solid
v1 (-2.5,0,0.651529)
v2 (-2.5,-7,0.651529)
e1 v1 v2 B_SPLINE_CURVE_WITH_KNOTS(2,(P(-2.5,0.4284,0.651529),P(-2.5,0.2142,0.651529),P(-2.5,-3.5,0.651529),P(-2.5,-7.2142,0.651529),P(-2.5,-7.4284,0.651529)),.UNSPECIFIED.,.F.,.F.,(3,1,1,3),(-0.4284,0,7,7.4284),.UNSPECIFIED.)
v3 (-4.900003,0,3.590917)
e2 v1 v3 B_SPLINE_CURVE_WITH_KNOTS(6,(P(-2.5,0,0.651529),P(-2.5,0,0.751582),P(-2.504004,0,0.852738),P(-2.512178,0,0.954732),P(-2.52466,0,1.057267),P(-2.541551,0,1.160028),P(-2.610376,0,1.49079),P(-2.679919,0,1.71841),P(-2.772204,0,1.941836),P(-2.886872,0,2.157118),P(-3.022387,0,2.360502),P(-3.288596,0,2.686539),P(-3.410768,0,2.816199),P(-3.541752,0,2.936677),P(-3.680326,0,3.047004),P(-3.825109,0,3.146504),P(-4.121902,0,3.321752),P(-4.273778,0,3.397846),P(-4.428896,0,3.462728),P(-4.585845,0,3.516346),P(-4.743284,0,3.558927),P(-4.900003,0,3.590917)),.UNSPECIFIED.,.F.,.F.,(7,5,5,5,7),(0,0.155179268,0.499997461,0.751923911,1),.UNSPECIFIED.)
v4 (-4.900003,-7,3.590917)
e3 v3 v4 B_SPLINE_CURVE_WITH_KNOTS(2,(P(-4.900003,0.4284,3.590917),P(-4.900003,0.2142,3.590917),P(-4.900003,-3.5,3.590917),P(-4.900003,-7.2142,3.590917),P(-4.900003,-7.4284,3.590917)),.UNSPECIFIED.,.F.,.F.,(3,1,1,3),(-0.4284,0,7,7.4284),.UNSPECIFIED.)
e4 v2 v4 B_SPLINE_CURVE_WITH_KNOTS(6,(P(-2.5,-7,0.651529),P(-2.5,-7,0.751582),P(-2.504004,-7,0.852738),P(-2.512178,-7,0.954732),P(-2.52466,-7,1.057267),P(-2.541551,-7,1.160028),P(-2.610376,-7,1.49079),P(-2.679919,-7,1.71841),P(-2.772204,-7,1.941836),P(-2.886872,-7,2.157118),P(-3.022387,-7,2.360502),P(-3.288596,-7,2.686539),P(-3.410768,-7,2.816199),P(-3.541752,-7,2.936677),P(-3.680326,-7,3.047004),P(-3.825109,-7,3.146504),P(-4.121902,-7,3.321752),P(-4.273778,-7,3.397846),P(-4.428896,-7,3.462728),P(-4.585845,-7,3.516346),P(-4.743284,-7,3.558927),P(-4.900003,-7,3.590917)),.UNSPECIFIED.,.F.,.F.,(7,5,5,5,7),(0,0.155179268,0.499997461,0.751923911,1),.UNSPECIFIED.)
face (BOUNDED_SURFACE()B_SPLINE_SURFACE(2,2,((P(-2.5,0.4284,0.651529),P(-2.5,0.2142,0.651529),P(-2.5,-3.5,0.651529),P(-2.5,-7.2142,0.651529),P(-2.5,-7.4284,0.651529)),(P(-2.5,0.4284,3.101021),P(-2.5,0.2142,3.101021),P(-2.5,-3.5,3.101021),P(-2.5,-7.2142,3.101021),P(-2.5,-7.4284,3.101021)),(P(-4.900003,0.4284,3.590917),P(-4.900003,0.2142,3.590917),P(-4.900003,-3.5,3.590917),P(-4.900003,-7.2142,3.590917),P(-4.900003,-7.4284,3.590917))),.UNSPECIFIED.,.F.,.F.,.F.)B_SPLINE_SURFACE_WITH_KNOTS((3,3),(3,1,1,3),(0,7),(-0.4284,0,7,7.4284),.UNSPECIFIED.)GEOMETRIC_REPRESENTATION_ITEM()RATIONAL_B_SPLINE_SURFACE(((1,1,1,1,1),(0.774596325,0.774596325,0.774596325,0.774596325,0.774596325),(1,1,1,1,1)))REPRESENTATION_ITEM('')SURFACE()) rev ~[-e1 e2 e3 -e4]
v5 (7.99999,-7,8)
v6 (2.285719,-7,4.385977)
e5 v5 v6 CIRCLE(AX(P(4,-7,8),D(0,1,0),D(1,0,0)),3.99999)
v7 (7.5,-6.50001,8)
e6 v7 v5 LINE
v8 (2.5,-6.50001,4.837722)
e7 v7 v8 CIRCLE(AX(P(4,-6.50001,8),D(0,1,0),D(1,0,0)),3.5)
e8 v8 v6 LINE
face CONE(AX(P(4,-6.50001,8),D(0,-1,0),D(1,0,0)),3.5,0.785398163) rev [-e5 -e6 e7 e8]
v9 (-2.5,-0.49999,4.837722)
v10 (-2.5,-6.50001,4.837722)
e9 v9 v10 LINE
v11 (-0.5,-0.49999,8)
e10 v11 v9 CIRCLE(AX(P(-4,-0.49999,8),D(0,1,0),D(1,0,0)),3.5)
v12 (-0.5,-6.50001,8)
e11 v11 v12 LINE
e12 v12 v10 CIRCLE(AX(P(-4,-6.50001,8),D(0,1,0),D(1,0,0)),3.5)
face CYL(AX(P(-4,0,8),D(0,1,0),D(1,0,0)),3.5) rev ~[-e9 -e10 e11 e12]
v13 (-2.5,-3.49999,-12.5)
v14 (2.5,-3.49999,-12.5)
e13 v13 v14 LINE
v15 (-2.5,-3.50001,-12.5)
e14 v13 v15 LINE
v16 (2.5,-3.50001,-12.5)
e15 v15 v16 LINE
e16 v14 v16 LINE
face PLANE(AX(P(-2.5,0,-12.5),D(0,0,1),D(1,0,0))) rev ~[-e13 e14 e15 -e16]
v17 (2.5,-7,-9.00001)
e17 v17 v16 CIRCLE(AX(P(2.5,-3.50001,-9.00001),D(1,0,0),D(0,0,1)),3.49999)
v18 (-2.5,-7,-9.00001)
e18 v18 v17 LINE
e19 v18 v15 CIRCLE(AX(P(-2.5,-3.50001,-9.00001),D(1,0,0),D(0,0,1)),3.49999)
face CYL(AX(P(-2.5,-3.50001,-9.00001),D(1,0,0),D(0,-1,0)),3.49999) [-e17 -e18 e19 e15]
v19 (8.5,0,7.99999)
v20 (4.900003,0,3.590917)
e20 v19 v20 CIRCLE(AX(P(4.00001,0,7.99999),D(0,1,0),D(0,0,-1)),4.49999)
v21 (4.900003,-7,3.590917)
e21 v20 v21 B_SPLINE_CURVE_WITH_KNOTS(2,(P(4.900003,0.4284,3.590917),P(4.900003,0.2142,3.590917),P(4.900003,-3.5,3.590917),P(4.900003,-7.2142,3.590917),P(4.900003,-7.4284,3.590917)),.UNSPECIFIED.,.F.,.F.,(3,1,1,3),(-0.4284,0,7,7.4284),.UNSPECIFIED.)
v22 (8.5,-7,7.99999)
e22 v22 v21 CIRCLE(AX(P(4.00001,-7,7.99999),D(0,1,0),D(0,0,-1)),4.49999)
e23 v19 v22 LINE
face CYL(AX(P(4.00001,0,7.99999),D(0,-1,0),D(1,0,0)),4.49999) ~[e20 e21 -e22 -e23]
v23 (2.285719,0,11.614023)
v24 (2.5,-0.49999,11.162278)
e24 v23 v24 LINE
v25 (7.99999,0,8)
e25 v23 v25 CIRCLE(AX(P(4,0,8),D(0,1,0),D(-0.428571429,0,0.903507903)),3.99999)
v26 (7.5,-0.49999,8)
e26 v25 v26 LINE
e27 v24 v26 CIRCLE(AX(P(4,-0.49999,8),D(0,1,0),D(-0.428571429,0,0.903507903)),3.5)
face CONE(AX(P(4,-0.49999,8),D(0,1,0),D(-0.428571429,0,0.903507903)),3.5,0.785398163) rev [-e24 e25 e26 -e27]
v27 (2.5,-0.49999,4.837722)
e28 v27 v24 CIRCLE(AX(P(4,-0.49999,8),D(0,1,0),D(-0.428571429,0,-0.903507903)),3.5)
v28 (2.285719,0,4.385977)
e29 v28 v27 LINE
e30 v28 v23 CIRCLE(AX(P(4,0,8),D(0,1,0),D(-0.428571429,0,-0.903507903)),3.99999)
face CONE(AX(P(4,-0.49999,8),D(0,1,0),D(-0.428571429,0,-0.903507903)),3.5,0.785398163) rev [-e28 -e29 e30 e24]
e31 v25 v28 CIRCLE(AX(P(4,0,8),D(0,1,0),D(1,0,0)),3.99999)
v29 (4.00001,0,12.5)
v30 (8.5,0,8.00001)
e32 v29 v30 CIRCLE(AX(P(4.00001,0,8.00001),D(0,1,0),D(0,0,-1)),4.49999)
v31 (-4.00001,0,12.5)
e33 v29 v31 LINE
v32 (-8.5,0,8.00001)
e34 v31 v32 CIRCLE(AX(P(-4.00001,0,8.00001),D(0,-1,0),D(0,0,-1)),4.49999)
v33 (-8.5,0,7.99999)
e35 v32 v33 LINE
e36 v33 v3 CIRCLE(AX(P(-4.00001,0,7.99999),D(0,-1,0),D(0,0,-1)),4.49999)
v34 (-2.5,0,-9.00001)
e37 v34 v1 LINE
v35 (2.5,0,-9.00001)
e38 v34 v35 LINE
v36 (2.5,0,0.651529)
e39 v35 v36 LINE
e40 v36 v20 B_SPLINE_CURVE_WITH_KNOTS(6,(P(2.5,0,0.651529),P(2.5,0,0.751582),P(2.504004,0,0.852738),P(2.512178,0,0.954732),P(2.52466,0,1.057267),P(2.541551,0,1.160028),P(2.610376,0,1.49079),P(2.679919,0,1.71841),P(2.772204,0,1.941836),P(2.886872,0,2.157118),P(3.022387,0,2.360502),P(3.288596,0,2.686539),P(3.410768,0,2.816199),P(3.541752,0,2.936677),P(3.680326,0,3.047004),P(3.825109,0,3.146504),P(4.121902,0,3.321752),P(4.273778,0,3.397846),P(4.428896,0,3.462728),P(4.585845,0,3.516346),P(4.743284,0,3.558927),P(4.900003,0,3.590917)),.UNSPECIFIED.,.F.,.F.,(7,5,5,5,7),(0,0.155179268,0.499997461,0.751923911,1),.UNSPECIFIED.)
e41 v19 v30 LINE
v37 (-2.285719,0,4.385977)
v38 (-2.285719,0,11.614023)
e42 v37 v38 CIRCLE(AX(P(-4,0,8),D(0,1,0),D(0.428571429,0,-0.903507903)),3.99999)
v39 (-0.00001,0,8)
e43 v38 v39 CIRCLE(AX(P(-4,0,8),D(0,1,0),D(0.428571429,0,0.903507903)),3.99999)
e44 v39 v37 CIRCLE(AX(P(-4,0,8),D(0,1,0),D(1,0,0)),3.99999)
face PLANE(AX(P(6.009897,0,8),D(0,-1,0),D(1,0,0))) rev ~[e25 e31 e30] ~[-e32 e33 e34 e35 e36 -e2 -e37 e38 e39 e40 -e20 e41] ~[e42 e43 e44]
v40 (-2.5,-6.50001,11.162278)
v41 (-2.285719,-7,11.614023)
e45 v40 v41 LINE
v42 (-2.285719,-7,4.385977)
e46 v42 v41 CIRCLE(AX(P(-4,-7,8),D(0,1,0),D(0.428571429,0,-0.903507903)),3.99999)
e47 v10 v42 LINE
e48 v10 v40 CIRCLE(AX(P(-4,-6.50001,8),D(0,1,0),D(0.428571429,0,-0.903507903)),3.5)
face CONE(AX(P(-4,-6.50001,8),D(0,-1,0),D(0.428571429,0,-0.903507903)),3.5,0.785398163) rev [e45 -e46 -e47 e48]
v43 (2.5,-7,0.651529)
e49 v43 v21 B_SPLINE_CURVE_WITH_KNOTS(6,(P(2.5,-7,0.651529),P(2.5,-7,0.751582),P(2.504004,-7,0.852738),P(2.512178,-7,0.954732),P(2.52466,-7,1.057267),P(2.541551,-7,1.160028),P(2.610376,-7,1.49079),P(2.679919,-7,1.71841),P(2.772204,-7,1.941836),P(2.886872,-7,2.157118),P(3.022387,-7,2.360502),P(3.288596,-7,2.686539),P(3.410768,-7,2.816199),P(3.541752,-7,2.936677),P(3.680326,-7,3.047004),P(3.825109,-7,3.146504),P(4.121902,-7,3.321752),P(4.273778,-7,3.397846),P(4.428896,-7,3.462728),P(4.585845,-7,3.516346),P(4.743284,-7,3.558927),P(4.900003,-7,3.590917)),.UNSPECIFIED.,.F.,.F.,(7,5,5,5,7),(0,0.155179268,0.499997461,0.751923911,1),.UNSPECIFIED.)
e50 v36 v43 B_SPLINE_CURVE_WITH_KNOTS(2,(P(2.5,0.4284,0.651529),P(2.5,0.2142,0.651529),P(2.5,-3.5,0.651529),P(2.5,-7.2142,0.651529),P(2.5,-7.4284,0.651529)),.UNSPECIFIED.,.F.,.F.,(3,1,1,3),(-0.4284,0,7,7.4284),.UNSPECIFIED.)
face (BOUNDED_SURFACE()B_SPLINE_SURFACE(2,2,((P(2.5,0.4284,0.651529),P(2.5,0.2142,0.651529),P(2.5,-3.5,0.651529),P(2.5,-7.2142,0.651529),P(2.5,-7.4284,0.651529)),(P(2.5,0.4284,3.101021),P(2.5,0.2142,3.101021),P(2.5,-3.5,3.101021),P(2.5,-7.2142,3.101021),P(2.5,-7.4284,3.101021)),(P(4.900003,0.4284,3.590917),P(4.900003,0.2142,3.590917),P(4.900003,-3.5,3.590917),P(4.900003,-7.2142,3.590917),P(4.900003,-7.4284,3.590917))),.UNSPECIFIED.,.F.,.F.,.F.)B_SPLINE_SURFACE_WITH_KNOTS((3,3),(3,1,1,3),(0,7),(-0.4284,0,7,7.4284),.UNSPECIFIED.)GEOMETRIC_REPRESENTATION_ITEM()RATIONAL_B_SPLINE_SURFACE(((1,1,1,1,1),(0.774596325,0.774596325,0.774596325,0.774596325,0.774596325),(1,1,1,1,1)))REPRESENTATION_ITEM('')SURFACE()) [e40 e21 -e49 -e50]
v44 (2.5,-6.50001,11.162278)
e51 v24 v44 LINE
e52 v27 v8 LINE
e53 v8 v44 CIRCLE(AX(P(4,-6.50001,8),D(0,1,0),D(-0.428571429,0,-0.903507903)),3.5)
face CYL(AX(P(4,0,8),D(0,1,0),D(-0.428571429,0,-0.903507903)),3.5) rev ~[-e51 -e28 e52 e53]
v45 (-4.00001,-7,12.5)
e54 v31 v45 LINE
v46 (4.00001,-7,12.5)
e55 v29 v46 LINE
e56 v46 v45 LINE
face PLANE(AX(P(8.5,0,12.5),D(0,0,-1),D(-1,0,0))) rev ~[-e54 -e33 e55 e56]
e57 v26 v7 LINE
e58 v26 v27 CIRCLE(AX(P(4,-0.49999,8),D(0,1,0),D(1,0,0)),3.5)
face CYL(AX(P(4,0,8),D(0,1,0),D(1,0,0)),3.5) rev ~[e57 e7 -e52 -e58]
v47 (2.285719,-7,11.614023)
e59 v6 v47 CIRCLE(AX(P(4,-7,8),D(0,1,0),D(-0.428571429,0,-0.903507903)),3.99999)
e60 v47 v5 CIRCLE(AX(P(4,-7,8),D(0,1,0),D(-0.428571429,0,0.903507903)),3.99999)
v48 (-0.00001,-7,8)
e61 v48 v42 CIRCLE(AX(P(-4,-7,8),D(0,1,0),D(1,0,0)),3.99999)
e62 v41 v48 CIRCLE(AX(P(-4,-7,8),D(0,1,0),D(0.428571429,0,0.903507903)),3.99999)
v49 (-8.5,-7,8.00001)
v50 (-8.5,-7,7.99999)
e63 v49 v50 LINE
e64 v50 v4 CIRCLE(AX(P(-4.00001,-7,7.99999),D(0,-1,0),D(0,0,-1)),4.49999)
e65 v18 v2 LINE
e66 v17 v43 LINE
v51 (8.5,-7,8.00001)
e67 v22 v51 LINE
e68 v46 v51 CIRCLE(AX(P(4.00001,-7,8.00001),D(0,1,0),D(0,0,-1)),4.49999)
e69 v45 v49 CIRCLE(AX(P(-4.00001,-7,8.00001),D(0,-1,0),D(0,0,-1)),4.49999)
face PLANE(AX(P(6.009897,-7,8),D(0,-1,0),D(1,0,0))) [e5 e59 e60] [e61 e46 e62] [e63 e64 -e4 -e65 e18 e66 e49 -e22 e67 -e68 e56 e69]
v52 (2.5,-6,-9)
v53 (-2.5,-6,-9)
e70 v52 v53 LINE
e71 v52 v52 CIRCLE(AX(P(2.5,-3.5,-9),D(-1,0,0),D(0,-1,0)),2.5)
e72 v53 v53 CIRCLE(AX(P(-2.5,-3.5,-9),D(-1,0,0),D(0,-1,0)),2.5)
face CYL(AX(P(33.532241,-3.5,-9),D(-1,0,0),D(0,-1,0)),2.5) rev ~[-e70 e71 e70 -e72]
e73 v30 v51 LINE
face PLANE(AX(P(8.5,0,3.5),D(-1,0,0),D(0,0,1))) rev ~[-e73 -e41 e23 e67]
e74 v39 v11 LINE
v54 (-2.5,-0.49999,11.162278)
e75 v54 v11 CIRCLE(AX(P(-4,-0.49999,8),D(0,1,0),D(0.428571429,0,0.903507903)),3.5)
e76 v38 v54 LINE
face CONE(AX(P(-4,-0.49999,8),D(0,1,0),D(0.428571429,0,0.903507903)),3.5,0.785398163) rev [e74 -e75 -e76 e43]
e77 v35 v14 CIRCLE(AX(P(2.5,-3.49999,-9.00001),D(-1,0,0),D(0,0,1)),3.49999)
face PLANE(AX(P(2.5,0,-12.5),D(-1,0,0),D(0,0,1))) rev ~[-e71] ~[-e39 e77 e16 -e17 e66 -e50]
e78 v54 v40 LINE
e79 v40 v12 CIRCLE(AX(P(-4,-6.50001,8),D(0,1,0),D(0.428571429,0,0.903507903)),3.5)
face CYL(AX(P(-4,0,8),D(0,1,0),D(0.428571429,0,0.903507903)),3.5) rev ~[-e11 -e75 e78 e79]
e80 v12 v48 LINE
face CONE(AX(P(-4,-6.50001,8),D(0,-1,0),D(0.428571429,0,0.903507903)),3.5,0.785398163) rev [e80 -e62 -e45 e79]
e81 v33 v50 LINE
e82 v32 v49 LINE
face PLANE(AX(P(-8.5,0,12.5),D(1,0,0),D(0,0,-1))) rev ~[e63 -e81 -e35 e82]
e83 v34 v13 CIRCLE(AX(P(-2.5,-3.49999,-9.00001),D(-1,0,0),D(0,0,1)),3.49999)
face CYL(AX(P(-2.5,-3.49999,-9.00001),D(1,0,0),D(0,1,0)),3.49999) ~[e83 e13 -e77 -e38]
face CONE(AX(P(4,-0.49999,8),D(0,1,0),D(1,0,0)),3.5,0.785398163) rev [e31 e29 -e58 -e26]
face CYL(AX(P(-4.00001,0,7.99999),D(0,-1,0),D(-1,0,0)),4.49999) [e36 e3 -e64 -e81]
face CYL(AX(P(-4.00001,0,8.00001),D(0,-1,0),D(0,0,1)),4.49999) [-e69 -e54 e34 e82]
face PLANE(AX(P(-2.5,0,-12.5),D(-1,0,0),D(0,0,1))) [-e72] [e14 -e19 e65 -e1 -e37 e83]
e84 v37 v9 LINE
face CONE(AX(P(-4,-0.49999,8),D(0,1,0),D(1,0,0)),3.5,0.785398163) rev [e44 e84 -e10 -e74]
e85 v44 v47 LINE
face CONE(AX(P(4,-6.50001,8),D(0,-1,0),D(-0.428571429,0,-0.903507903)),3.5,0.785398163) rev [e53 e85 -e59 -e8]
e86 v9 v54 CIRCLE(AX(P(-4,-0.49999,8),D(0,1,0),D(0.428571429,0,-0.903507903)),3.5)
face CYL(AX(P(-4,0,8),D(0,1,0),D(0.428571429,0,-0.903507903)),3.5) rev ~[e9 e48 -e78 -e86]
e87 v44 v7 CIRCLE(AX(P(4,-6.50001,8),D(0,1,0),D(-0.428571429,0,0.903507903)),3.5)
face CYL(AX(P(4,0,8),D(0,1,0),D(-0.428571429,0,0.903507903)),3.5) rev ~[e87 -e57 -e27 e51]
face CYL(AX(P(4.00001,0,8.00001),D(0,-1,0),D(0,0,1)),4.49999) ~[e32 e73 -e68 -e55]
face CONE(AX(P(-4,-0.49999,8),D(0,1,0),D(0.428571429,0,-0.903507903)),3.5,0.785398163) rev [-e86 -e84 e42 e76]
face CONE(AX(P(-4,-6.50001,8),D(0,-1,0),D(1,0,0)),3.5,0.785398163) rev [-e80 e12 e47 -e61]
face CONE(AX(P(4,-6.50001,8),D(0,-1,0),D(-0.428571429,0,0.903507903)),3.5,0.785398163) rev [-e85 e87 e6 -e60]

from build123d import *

# Parameters (mm, degrees)
F0_W     = 5
F0_H     = 16
F1_DEPTH = 7
F3_D     = 5
F4_R     = 4.49999
F5_R     = 3.49999
F6_R     = 3
F7_SIZE  = 0.49999


# Not quite as in the source:
# - a fillet or chamfer is up to 0.001 mm smaller than in the source, because OpenCascade refuses the exact size


with BuildPart() as f1:
    # F0 (on Front) → F1 (new body)
    with BuildSketch(Plane.XZ):
        with BuildLine():
            Line((8.5, 12.5), (2.5, 12.5))
            Line((2.5, 12.5), (2.5, 11.1622776602))
            ThreePointArc((2.5, 11.1622776602), (5.8708286934, 10.9580398915), (7.5, 8))
            ThreePointArc((7.5, 8), (5.8708286934, 5.0419601085), (2.5, 4.8377223398))
            Line((2.5, 4.8377223398), (2.5, 3.5))
            Line((2.5, 3.5), (8.5, 3.5))
            Line((8.5, 3.5), (8.5, 12.5))
        make_face()
        with BuildLine():
            Line((-2.5, 11.1622776602), (-2.5, 12.5))
            Line((-2.5, 12.5), (-8.5, 12.5))
            Line((-8.5, 12.5), (-8.5, 3.5))
            Line((-8.5, 3.5), (-2.5, 3.5))
            Line((-2.5, 3.5), (-2.5, 4.8377223398))
            ThreePointArc((-2.5, 4.8377223398), (-7.5, 8), (-2.5, 11.1622776602))
        make_face()
        with BuildLine():
            Line((2.5, 11.1622776602), (2.5, 12.5))
            Line((2.5, 12.5), (-2.5, 12.5))
            Line((-2.5, 12.5), (-2.5, 11.1622776602))
            ThreePointArc((-2.5, 11.1622776602), (-1.0419601085, 9.8708286934), (-0.5, 8))
            ThreePointArc((-0.5, 8), (-1.0419601085, 6.1291713066), (-2.5, 4.8377223398))
            Line((-2.5, 4.8377223398), (-2.5, 3.5))
            Line((-2.5, 3.5), (2.5, 3.5))
            Line((2.5, 3.5), (2.5, 4.8377223398))
            ThreePointArc((2.5, 4.8377223398), (0.5, 8), (2.5, 11.1622776602))
        make_face()
        with Locations((0, -4.5)):
            Rectangle(F0_W, F0_H)
    extrude(amount=F1_DEPTH)

    # F3 (through all)
    with Locations(Plane.YZ.offset(2.5)):
        with Locations((-3.5, -9)):
            Hole(F3_D / 2)

    # F4 (radius 4.5 in the source; OpenCascade refuses exactly that, so slightly less here)
    f4_edges = [f1.edges().sort_by_distance(p)[0] for p in [
        (8.5, -3.5, 12.5),
        (-8.5, -3.5, 12.5),
        (8.5, -3.5, 3.5),
        (-8.5, -3.5, 3.5),
    ]]
    fillet(f4_edges, radius=F4_R)

    # F5 (radius 3.5 in the source; OpenCascade refuses exactly that, so slightly less here)
    f5_edges = [f1.edges().sort_by_distance(p)[0] for p in [
        (0, 0, -12.5),
        (0, -7, -12.5),
    ]]
    fillet(f5_edges, radius=F5_R)

    # F6
    f6_edges = [f1.edges().sort_by_distance(p)[0] for p in [
        (2.5, -3.5, 3.5),
        (-2.5, -3.5, 3.5),
    ]]
    fillet(f6_edges, radius=F6_R)

    # F7 (size 0.5 in the source; OpenCascade refuses exactly that, so slightly less here)
    f7_edges = [f1.edges().sort_by_distance(p)[0] for p in [
        (-7.5, -7, 8),
        (5.5, -7, 11.162278),
        (-7.5, 0, 8),
        (5.5, 0, 11.162278),
    ]]
    chamfer(f7_edges, length=F7_SIZE)


solid = f1.part
